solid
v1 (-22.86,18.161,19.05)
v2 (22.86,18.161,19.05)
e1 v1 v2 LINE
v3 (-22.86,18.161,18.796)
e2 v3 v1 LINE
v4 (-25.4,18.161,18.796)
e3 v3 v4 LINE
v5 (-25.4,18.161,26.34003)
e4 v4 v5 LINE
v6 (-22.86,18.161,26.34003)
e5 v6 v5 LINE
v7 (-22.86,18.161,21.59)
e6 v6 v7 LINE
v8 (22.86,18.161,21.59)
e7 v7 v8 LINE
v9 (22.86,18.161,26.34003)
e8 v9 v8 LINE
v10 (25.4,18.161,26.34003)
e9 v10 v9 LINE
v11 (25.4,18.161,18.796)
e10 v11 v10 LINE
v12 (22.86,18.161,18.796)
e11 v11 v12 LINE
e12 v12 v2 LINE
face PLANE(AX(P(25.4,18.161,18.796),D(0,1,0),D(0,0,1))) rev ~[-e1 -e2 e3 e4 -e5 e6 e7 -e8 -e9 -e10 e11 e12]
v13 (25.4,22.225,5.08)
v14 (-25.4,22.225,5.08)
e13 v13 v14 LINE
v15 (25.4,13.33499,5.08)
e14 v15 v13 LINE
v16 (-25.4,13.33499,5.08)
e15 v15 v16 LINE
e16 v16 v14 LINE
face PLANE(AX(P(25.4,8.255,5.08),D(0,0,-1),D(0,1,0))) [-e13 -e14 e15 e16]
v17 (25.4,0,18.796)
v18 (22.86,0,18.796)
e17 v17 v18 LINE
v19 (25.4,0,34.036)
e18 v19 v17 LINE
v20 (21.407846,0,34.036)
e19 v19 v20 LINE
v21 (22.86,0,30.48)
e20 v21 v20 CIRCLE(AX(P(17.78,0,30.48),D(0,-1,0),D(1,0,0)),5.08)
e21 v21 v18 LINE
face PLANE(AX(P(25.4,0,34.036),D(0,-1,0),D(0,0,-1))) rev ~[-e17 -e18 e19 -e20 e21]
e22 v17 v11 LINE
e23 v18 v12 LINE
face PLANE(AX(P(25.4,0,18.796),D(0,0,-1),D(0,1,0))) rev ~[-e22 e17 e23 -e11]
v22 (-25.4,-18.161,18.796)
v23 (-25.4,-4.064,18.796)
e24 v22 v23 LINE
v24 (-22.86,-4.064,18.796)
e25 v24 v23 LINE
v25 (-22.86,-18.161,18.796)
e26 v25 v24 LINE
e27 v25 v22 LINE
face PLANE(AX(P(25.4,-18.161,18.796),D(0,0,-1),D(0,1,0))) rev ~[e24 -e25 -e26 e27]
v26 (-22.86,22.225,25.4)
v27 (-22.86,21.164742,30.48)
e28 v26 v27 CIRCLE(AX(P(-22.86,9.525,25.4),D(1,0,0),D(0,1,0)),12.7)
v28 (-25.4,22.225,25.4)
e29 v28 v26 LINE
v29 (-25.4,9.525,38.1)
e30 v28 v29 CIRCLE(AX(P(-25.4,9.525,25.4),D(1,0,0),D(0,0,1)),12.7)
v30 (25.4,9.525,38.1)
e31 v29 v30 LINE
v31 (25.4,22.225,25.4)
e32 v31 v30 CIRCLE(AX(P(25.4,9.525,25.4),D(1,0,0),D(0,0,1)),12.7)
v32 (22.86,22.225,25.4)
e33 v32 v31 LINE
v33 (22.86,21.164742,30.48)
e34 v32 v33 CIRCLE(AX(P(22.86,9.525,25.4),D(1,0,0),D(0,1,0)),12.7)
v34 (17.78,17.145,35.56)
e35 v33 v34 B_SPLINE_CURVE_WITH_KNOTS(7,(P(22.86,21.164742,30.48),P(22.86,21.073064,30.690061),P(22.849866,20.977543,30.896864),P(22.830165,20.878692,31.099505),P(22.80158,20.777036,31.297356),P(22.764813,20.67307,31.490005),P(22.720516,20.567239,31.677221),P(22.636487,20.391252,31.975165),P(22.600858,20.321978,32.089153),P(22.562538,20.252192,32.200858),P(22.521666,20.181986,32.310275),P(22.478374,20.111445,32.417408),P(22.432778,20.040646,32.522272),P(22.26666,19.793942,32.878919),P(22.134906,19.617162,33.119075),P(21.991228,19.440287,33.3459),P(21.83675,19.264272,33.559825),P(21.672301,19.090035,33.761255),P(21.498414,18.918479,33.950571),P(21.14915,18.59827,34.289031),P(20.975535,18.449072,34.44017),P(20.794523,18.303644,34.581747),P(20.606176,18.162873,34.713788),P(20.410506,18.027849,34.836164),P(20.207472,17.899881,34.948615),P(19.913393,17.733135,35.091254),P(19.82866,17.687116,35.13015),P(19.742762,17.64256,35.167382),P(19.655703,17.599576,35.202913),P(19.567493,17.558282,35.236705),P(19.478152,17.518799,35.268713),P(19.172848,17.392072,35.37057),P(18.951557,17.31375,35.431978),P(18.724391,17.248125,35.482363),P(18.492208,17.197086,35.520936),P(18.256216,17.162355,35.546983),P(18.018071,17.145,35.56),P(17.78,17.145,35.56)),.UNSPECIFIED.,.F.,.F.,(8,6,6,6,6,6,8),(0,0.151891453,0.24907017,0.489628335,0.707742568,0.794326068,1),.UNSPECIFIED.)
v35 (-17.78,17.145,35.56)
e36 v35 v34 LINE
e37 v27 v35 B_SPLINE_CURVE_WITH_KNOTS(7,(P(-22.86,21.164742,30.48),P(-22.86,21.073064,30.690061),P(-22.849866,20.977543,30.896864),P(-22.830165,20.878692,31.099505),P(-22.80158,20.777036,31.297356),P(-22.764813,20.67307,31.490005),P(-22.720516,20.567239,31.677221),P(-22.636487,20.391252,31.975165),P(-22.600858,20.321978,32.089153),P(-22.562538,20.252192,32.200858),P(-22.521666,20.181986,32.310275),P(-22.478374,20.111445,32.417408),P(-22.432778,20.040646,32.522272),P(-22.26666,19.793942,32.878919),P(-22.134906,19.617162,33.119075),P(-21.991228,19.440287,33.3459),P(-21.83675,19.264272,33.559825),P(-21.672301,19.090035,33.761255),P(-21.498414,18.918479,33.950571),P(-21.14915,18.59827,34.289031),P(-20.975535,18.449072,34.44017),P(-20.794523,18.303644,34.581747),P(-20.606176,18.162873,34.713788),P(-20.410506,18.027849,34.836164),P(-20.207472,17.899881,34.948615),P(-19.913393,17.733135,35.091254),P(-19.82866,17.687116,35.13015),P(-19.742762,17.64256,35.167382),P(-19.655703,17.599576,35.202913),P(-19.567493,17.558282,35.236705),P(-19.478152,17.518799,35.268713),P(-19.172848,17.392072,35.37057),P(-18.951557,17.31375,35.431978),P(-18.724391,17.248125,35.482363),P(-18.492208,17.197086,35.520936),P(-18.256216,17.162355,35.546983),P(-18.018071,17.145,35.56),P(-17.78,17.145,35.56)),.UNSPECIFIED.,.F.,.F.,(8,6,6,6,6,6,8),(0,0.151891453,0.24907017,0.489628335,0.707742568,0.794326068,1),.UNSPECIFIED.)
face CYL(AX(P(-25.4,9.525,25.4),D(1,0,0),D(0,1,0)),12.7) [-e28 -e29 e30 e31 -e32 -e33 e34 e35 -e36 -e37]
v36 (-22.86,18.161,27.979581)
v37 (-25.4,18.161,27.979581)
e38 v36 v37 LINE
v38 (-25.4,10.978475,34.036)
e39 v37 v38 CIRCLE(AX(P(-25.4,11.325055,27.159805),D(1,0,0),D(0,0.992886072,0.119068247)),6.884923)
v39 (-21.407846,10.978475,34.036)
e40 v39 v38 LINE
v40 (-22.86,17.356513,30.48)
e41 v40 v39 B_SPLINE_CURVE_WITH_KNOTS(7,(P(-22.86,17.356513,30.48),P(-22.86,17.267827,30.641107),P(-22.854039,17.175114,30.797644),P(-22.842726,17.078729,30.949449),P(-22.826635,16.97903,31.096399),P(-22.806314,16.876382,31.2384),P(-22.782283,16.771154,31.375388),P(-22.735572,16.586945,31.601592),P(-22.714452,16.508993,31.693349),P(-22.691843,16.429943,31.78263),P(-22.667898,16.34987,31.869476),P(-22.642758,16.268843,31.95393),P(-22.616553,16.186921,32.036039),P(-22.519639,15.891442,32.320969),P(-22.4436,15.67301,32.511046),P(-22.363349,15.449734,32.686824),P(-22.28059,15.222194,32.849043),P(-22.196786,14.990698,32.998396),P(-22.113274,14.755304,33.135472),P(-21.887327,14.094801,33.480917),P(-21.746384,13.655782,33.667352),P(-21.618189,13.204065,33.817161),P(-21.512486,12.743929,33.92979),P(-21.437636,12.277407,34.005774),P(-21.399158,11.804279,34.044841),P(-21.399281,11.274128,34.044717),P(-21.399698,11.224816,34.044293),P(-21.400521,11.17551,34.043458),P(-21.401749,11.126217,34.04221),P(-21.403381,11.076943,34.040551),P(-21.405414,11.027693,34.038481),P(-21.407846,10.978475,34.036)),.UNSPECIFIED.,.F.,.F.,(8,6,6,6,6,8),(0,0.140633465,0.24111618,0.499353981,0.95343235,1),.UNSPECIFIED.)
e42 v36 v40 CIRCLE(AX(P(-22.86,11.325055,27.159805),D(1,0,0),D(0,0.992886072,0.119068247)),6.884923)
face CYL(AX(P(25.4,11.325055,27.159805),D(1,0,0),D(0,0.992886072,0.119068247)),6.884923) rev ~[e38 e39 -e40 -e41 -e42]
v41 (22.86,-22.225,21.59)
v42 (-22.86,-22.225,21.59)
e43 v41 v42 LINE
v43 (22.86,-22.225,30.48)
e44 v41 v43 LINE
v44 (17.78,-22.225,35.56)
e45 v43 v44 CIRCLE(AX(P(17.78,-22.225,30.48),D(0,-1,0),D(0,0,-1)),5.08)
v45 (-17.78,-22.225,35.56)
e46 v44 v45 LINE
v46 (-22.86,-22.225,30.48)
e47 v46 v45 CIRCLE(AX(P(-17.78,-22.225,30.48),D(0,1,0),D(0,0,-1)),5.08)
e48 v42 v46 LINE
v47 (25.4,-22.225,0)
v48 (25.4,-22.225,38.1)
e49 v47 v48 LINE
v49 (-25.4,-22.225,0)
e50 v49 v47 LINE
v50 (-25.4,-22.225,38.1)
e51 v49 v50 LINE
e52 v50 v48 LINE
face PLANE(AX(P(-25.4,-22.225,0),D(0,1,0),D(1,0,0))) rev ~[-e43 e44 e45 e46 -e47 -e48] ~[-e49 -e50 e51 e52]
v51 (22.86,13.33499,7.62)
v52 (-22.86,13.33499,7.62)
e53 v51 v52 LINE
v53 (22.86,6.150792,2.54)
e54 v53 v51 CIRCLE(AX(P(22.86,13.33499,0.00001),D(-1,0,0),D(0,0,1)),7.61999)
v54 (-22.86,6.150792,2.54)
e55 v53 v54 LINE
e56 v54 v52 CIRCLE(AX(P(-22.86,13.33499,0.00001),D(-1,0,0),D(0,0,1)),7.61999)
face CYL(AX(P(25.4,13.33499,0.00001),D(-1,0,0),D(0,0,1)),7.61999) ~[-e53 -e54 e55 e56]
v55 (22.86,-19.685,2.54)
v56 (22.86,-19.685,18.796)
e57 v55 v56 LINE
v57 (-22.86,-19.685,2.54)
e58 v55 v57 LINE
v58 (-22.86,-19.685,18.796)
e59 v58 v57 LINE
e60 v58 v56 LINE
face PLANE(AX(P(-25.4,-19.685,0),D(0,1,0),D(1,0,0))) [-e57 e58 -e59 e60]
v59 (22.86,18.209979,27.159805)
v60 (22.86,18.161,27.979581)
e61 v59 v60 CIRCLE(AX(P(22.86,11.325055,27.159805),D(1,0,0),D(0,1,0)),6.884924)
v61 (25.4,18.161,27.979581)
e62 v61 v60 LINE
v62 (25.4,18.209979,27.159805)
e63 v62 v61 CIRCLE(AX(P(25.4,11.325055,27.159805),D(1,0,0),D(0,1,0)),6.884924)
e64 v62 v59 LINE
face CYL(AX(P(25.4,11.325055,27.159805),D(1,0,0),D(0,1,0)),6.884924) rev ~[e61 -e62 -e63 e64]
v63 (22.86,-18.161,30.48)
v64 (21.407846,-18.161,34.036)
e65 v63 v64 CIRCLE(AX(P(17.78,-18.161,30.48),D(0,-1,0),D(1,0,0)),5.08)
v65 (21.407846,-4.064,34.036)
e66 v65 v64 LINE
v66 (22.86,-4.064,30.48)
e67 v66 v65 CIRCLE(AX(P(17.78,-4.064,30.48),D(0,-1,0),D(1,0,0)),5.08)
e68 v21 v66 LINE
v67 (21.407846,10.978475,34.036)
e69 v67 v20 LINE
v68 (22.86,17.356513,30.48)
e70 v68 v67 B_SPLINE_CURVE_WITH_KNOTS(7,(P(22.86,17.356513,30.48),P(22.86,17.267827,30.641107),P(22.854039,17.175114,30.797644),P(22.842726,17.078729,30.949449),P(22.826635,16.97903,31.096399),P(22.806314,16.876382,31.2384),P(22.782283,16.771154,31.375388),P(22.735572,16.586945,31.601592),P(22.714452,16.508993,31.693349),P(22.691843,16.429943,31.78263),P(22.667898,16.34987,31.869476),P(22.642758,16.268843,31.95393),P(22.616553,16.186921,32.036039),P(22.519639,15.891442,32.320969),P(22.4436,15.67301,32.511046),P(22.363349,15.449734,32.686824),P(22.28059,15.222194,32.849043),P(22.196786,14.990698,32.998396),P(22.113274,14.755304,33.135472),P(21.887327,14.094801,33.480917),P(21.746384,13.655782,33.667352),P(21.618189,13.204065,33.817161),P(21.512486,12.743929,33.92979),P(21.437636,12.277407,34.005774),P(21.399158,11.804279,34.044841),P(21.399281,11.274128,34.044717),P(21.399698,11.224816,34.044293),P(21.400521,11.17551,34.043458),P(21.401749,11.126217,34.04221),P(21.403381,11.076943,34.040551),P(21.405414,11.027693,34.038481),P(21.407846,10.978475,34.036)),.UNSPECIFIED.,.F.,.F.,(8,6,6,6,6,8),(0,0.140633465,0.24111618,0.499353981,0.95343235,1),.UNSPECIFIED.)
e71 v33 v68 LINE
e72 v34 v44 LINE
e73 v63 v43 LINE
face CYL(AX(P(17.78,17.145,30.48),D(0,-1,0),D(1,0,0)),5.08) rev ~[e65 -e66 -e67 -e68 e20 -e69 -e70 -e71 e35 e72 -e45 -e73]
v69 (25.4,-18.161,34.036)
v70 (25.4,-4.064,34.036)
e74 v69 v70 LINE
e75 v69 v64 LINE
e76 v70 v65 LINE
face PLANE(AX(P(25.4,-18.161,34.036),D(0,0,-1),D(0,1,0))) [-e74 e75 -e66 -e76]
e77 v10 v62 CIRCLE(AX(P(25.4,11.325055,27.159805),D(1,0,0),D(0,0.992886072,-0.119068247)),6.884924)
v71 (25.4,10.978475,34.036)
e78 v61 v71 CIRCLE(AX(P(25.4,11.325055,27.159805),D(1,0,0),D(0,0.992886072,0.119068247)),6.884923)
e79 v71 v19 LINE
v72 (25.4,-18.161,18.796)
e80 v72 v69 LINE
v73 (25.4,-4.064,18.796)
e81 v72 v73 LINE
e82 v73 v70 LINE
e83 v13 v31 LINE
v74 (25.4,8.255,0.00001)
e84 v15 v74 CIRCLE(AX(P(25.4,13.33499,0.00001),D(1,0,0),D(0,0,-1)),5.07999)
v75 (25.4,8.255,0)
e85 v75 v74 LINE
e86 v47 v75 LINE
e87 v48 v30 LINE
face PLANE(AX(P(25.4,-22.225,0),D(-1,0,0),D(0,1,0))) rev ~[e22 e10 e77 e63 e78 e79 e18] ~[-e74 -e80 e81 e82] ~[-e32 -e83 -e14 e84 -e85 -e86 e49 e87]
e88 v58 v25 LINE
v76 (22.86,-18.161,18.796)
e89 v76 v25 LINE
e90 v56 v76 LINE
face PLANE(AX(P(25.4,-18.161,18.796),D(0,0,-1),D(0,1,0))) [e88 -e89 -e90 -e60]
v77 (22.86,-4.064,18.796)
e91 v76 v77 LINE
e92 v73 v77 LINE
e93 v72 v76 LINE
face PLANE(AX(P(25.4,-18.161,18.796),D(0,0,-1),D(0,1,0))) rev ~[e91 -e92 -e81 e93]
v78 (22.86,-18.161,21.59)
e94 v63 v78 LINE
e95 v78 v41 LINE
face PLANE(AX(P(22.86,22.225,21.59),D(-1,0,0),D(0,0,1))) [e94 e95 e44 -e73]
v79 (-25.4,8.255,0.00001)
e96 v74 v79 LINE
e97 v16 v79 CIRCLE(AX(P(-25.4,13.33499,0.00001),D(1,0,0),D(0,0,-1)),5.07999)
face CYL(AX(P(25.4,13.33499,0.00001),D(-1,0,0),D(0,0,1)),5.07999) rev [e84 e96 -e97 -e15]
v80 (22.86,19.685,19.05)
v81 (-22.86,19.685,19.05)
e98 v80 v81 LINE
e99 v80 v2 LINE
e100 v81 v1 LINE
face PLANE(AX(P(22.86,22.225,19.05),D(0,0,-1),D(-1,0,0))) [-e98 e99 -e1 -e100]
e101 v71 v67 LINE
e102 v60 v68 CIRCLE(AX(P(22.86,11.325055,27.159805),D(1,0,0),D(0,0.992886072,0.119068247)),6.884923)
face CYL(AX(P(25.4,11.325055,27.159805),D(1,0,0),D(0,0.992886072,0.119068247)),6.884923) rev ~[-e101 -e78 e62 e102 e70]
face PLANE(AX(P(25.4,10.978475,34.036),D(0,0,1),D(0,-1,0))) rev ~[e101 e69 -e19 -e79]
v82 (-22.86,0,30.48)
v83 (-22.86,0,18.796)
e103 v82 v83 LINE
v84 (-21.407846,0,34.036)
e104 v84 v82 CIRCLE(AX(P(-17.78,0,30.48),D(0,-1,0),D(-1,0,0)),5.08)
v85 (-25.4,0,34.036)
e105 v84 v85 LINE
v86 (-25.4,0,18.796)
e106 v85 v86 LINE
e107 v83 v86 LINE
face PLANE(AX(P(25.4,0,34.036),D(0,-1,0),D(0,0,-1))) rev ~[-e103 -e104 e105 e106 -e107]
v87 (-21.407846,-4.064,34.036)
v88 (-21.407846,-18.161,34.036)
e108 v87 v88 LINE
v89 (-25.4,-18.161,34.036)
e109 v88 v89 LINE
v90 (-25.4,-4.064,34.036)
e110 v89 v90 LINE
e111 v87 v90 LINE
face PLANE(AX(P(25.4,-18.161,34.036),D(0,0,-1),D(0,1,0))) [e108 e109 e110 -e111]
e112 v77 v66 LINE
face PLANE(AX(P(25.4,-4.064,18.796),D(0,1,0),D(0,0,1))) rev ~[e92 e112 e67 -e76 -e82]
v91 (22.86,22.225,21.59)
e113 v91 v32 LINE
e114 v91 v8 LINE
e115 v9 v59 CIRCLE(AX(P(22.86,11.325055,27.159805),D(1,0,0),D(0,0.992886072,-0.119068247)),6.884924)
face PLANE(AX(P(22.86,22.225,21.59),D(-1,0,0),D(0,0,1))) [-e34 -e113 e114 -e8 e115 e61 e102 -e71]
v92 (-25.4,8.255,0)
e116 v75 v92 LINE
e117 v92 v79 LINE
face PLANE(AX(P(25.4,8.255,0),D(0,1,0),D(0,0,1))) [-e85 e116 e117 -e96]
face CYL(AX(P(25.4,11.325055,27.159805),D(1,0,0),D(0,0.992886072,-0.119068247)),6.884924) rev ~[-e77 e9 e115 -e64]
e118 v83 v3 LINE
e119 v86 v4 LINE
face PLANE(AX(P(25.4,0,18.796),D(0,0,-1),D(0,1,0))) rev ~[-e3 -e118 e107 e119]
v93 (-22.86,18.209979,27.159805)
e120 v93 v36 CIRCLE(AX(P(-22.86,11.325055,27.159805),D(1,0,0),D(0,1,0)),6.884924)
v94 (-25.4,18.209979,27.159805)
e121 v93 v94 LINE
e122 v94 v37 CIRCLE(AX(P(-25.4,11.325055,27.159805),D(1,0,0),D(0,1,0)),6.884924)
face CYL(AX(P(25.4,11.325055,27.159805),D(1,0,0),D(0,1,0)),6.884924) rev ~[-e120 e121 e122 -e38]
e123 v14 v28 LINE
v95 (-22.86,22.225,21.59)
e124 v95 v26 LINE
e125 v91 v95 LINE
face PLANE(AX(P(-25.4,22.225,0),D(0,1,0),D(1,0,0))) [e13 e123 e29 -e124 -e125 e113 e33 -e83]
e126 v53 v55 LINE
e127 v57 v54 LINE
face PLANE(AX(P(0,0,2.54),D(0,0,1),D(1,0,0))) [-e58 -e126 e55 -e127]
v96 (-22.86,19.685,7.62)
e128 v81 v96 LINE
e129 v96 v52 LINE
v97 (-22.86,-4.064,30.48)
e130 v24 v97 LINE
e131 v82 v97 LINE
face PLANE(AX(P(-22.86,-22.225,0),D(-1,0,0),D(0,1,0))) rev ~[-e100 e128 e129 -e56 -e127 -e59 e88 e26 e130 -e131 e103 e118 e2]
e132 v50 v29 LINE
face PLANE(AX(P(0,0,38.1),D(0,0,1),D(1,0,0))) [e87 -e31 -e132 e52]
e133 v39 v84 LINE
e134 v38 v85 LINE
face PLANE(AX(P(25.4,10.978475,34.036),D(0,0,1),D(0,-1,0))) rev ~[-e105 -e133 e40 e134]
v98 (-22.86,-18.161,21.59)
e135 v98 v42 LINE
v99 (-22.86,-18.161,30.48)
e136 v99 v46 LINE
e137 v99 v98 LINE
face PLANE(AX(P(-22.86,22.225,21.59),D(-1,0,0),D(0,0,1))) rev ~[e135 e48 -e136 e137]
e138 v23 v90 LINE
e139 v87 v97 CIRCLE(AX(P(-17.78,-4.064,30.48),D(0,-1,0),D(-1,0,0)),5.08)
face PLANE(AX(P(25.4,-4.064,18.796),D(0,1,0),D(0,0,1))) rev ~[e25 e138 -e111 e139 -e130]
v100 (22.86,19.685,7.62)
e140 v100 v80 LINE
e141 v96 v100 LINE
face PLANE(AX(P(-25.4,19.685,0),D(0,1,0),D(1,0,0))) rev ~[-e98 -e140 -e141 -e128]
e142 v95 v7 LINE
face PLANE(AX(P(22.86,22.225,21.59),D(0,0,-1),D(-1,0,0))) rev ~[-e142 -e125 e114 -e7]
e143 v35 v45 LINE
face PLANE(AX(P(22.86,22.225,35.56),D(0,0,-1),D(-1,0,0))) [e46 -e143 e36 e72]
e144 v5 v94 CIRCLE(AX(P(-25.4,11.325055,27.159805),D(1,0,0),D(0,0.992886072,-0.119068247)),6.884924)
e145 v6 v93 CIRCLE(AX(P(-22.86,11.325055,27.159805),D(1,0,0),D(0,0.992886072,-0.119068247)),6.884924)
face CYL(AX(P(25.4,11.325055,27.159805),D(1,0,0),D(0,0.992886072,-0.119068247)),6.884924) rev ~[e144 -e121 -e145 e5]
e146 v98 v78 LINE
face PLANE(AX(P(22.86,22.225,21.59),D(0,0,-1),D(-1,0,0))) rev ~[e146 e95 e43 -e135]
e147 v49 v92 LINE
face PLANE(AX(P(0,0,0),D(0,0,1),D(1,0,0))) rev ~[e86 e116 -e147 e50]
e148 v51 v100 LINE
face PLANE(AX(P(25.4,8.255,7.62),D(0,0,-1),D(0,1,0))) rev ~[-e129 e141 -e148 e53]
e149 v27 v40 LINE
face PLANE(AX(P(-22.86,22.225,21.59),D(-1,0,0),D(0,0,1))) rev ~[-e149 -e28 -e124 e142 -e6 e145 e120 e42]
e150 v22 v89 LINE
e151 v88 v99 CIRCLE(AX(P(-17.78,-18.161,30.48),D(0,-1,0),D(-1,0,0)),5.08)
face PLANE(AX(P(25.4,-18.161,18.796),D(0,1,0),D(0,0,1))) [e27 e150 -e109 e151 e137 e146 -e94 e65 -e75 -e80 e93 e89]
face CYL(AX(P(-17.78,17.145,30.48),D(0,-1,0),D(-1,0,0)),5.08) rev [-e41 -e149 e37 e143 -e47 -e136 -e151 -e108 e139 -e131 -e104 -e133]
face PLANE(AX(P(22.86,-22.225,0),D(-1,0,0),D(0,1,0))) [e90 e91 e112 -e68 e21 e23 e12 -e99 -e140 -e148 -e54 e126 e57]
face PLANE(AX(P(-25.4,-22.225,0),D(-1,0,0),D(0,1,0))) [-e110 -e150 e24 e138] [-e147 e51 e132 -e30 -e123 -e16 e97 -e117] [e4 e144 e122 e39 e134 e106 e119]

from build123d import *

# Parameters (mm, degrees)
F0_W         = 50.8
F0_H         = 44.45
F1_DEPTH     = 38.1
F2_W         = 13.97
F2_H         = 5.08
F3_DEPTH     = 50.8
F4_R         = 12.7
F5_W         = 45.72
F5_H         = 13.97
F6_DEPTH     = 50.8
F7_R         = 5.08
F8_W         = 14.097
F8_H         = 15.24
F9_DEPTH     = 50.8
F10_R        = 5.07999
F11_T        = 2.54
F11_T3_DEPTH = 9.0721543583
F11_T5_DEPTH = 9.0721543583
F11_T7_DEPTH = 9.144
F11_T9_DEPTH = 9.144


# Not quite as in the source:
# - a fillet or chamfer is up to 0.001 mm smaller than in the source, because OpenCascade refuses the exact size
# - a shell that OpenCascade refuses in one call is made with other operations: the cavity is built on its own and cut out


with BuildPart() as f1:
    # F0 (on Top) → F1 (new body)
    with BuildSketch(Plane.XY):
        Rectangle(F0_W, F0_H)
    extrude(amount=F1_DEPTH)

    # F2 (on face) → F3 (cut)
    with BuildSketch(Plane.YZ.offset(25.4)):
        with Locations((15.24, 2.54)):
            Rectangle(F2_W, F2_H)
    extrude(amount=-F3_DEPTH, mode=Mode.SUBTRACT)

    # F4
    f4_edges = [f1.edges().sort_by_distance(p)[0] for p in [
        (0, 22.225, 38.1),
    ]]
    fillet(f4_edges, radius=F4_R)

    # F5 (on face) → F6 (cut)
    with BuildSketch(Plane(origin=(0, 22.225, 0), x_dir=(-1, 0, 0), z_dir=(0, 1, 0))):
        with Locations((0, 28.575)):
            Rectangle(F5_W, F5_H)
    extrude(amount=-F6_DEPTH, mode=Mode.SUBTRACT)

    # F7
    f7_edges = [f1.edges().sort_by_distance(p)[0] for p in [
        (22.86, -2.54, 35.56),
        (-22.86, -2.54, 35.56),
    ]]
    fillet(f7_edges, radius=F7_R)

    # F8 (on face) → F9 (cut)
    with BuildSketch(Plane.YZ.offset(25.4)):
        with BuildLine():
            ThreePointArc((18.161, 26.3400295448), (18.1977232283, 26.7491865029), (18.2099788483, 27.1598053184))
            ThreePointArc((18.2099788483, 27.1598053184), (18.1977232283, 27.5704241338), (18.161, 27.9795810919))
            Line((18.161, 27.9795810919), (18.161, 26.3400295448))
        make_face()
        with BuildLine():
            Line((18.161, 26.3400295448), (18.161, 27.9795810919))
            ThreePointArc((18.161, 27.9795810919), (15.7632997742, 32.4232792644), (10.978474631, 34.036))
            ThreePointArc((10.978474631, 34.036), (6.2916716696, 22.46222933), (18.161, 26.3400295448))
        make_face()
        with BuildLine():
            Line((18.161, 18.796), (18.161, 26.3400295448))
            ThreePointArc((18.161, 26.3400295448), (6.2916716696, 22.46222933), (10.978474631, 34.036))
            Line((10.978474631, 34.036), (0, 34.036))
            Line((0, 34.036), (0, 18.796))
            Line((0, 18.796), (18.161, 18.796))
        make_face()
        with Locations((-11.1125, 26.416)):
            Rectangle(F8_W, F8_H)
    extrude(amount=-F9_DEPTH, mode=Mode.SUBTRACT)

    # F10 (radius 5.08 in the source; OpenCascade refuses exactly that, so slightly less here)
    f10_edges = [f1.edges().sort_by_distance(p)[0] for p in [
        (0, 8.255, 5.08),
    ]]
    fillet(f10_edges, radius=F10_R)

    # F11: shell of thickness 2.54, made by hand


with BuildPart() as f11_core1:
    # F11_t2: copy of F1
    add(f1.part)

    # the walls: a layer under each face that stays
    f11_faces = [f11_core1.faces().sort_by_distance(p)[0] for p in [
        (-25.4, 14.8166666667, 6.35),
        (0, 17.779995, 5.08),
        (0, 9.7428946226, 3.5921053774),
        (0, 22.225, 15.24),
        (0, 8.255, 5e-06),
        (16.9333333333, 12.8120018728, 37.6672579939),
        (0, -6.985, 0),
        (0, -6.35, 38.1),
        (0, -22.225, 19.05),
        (-23.4039228208, 5.4892373155, 34.036),
        (-23.3996024836, 16.3584390419, 31.8573813067),
        (-23.4039228208, -11.1125, 34.036),
        (-16.9333333333, -18.161, 21.336),
        (25.4, -14.8166666667, 6.35),
        (-22.86, 19.7907563947, 26.035),
        (0, 20.193, 21.59),
        (22.86, 19.7907563947, 26.035),
        (-21.3721024484, -0.5301288674, 34.0721024484),
        (0, -2.54, 35.56),
        (21.3721024484, -0.5301288674, 34.0721024484),
        (22.86, -20.193, 26.035),
        (0, -20.193, 21.59),
        (-22.86, -20.193, 26.035),
        (-22.86, -2.032, 26.035),
        (22.86, -2.032, 26.035),
        (23.4039228208, 5.4892373155, 34.036),
        (23.3996024836, 16.3584390419, 31.8573813067),
        (23.4039228208, -11.1125, 34.036),
    ]]
    thicken(f11_faces, amount=-F11_T, mode=Mode.SUBTRACT)

    # F11_s4 → F11_t3 (cut)
    with BuildSketch(Plane.YZ.offset(-27.94)):
        Polygon((-18.1356, 34.0106), (-18.161, 36.576), (-20.701, 36.576), (-20.701, 34.036), align=None)
    extrude(amount=F11_T3_DEPTH, mode=Mode.SUBTRACT)

    # F11_s6 → F11_t5 (cut)
    with BuildSketch(Plane.YZ.offset(18.8678456417)):
        Polygon((-18.1356, 34.0106), (-20.701, 34.036), (-20.701, 36.576), (-18.161, 36.576), align=None)
    extrude(amount=F11_T5_DEPTH, mode=Mode.SUBTRACT)

    # F11_s8 → F11_t7 (cut)
    with BuildSketch(Plane.XZ.offset(-24.765)):
        Polygon((-22.8346, 21.6154), (-25.4, 21.59), (-25.4, 19.05), (-22.86, 19.05), align=None)
        Polygon((22.8346, 21.6154), (22.86, 19.05), (25.4, 19.05), (25.4, 21.59), align=None)
    extrude(amount=F11_T7_DEPTH, mode=Mode.SUBTRACT)

    # F11_s10 → F11_t9 (cut)
    with BuildSketch(Plane.XZ.offset(15.621)):
        Polygon((22.8346, 21.6154), (25.4, 21.59), (25.4, 19.05), (22.86, 19.05), align=None)
        Polygon((-22.8346, 21.6154), (-22.86, 19.05), (-25.4, 19.05), (-25.4, 21.59), align=None)
    extrude(amount=F11_T9_DEPTH, mode=Mode.SUBTRACT)


with BuildPart() as f1_1:
    add(f1.part)

    # what is left inside the walls is the cavity
    f11_cavity = [f11_core1.part.solids().sort_by_distance(p)[0] for p in [
        (0, -11.073069, 2.5654),
    ]]
    add(f11_cavity, mode=Mode.SUBTRACT)


solid = f1_1.part
